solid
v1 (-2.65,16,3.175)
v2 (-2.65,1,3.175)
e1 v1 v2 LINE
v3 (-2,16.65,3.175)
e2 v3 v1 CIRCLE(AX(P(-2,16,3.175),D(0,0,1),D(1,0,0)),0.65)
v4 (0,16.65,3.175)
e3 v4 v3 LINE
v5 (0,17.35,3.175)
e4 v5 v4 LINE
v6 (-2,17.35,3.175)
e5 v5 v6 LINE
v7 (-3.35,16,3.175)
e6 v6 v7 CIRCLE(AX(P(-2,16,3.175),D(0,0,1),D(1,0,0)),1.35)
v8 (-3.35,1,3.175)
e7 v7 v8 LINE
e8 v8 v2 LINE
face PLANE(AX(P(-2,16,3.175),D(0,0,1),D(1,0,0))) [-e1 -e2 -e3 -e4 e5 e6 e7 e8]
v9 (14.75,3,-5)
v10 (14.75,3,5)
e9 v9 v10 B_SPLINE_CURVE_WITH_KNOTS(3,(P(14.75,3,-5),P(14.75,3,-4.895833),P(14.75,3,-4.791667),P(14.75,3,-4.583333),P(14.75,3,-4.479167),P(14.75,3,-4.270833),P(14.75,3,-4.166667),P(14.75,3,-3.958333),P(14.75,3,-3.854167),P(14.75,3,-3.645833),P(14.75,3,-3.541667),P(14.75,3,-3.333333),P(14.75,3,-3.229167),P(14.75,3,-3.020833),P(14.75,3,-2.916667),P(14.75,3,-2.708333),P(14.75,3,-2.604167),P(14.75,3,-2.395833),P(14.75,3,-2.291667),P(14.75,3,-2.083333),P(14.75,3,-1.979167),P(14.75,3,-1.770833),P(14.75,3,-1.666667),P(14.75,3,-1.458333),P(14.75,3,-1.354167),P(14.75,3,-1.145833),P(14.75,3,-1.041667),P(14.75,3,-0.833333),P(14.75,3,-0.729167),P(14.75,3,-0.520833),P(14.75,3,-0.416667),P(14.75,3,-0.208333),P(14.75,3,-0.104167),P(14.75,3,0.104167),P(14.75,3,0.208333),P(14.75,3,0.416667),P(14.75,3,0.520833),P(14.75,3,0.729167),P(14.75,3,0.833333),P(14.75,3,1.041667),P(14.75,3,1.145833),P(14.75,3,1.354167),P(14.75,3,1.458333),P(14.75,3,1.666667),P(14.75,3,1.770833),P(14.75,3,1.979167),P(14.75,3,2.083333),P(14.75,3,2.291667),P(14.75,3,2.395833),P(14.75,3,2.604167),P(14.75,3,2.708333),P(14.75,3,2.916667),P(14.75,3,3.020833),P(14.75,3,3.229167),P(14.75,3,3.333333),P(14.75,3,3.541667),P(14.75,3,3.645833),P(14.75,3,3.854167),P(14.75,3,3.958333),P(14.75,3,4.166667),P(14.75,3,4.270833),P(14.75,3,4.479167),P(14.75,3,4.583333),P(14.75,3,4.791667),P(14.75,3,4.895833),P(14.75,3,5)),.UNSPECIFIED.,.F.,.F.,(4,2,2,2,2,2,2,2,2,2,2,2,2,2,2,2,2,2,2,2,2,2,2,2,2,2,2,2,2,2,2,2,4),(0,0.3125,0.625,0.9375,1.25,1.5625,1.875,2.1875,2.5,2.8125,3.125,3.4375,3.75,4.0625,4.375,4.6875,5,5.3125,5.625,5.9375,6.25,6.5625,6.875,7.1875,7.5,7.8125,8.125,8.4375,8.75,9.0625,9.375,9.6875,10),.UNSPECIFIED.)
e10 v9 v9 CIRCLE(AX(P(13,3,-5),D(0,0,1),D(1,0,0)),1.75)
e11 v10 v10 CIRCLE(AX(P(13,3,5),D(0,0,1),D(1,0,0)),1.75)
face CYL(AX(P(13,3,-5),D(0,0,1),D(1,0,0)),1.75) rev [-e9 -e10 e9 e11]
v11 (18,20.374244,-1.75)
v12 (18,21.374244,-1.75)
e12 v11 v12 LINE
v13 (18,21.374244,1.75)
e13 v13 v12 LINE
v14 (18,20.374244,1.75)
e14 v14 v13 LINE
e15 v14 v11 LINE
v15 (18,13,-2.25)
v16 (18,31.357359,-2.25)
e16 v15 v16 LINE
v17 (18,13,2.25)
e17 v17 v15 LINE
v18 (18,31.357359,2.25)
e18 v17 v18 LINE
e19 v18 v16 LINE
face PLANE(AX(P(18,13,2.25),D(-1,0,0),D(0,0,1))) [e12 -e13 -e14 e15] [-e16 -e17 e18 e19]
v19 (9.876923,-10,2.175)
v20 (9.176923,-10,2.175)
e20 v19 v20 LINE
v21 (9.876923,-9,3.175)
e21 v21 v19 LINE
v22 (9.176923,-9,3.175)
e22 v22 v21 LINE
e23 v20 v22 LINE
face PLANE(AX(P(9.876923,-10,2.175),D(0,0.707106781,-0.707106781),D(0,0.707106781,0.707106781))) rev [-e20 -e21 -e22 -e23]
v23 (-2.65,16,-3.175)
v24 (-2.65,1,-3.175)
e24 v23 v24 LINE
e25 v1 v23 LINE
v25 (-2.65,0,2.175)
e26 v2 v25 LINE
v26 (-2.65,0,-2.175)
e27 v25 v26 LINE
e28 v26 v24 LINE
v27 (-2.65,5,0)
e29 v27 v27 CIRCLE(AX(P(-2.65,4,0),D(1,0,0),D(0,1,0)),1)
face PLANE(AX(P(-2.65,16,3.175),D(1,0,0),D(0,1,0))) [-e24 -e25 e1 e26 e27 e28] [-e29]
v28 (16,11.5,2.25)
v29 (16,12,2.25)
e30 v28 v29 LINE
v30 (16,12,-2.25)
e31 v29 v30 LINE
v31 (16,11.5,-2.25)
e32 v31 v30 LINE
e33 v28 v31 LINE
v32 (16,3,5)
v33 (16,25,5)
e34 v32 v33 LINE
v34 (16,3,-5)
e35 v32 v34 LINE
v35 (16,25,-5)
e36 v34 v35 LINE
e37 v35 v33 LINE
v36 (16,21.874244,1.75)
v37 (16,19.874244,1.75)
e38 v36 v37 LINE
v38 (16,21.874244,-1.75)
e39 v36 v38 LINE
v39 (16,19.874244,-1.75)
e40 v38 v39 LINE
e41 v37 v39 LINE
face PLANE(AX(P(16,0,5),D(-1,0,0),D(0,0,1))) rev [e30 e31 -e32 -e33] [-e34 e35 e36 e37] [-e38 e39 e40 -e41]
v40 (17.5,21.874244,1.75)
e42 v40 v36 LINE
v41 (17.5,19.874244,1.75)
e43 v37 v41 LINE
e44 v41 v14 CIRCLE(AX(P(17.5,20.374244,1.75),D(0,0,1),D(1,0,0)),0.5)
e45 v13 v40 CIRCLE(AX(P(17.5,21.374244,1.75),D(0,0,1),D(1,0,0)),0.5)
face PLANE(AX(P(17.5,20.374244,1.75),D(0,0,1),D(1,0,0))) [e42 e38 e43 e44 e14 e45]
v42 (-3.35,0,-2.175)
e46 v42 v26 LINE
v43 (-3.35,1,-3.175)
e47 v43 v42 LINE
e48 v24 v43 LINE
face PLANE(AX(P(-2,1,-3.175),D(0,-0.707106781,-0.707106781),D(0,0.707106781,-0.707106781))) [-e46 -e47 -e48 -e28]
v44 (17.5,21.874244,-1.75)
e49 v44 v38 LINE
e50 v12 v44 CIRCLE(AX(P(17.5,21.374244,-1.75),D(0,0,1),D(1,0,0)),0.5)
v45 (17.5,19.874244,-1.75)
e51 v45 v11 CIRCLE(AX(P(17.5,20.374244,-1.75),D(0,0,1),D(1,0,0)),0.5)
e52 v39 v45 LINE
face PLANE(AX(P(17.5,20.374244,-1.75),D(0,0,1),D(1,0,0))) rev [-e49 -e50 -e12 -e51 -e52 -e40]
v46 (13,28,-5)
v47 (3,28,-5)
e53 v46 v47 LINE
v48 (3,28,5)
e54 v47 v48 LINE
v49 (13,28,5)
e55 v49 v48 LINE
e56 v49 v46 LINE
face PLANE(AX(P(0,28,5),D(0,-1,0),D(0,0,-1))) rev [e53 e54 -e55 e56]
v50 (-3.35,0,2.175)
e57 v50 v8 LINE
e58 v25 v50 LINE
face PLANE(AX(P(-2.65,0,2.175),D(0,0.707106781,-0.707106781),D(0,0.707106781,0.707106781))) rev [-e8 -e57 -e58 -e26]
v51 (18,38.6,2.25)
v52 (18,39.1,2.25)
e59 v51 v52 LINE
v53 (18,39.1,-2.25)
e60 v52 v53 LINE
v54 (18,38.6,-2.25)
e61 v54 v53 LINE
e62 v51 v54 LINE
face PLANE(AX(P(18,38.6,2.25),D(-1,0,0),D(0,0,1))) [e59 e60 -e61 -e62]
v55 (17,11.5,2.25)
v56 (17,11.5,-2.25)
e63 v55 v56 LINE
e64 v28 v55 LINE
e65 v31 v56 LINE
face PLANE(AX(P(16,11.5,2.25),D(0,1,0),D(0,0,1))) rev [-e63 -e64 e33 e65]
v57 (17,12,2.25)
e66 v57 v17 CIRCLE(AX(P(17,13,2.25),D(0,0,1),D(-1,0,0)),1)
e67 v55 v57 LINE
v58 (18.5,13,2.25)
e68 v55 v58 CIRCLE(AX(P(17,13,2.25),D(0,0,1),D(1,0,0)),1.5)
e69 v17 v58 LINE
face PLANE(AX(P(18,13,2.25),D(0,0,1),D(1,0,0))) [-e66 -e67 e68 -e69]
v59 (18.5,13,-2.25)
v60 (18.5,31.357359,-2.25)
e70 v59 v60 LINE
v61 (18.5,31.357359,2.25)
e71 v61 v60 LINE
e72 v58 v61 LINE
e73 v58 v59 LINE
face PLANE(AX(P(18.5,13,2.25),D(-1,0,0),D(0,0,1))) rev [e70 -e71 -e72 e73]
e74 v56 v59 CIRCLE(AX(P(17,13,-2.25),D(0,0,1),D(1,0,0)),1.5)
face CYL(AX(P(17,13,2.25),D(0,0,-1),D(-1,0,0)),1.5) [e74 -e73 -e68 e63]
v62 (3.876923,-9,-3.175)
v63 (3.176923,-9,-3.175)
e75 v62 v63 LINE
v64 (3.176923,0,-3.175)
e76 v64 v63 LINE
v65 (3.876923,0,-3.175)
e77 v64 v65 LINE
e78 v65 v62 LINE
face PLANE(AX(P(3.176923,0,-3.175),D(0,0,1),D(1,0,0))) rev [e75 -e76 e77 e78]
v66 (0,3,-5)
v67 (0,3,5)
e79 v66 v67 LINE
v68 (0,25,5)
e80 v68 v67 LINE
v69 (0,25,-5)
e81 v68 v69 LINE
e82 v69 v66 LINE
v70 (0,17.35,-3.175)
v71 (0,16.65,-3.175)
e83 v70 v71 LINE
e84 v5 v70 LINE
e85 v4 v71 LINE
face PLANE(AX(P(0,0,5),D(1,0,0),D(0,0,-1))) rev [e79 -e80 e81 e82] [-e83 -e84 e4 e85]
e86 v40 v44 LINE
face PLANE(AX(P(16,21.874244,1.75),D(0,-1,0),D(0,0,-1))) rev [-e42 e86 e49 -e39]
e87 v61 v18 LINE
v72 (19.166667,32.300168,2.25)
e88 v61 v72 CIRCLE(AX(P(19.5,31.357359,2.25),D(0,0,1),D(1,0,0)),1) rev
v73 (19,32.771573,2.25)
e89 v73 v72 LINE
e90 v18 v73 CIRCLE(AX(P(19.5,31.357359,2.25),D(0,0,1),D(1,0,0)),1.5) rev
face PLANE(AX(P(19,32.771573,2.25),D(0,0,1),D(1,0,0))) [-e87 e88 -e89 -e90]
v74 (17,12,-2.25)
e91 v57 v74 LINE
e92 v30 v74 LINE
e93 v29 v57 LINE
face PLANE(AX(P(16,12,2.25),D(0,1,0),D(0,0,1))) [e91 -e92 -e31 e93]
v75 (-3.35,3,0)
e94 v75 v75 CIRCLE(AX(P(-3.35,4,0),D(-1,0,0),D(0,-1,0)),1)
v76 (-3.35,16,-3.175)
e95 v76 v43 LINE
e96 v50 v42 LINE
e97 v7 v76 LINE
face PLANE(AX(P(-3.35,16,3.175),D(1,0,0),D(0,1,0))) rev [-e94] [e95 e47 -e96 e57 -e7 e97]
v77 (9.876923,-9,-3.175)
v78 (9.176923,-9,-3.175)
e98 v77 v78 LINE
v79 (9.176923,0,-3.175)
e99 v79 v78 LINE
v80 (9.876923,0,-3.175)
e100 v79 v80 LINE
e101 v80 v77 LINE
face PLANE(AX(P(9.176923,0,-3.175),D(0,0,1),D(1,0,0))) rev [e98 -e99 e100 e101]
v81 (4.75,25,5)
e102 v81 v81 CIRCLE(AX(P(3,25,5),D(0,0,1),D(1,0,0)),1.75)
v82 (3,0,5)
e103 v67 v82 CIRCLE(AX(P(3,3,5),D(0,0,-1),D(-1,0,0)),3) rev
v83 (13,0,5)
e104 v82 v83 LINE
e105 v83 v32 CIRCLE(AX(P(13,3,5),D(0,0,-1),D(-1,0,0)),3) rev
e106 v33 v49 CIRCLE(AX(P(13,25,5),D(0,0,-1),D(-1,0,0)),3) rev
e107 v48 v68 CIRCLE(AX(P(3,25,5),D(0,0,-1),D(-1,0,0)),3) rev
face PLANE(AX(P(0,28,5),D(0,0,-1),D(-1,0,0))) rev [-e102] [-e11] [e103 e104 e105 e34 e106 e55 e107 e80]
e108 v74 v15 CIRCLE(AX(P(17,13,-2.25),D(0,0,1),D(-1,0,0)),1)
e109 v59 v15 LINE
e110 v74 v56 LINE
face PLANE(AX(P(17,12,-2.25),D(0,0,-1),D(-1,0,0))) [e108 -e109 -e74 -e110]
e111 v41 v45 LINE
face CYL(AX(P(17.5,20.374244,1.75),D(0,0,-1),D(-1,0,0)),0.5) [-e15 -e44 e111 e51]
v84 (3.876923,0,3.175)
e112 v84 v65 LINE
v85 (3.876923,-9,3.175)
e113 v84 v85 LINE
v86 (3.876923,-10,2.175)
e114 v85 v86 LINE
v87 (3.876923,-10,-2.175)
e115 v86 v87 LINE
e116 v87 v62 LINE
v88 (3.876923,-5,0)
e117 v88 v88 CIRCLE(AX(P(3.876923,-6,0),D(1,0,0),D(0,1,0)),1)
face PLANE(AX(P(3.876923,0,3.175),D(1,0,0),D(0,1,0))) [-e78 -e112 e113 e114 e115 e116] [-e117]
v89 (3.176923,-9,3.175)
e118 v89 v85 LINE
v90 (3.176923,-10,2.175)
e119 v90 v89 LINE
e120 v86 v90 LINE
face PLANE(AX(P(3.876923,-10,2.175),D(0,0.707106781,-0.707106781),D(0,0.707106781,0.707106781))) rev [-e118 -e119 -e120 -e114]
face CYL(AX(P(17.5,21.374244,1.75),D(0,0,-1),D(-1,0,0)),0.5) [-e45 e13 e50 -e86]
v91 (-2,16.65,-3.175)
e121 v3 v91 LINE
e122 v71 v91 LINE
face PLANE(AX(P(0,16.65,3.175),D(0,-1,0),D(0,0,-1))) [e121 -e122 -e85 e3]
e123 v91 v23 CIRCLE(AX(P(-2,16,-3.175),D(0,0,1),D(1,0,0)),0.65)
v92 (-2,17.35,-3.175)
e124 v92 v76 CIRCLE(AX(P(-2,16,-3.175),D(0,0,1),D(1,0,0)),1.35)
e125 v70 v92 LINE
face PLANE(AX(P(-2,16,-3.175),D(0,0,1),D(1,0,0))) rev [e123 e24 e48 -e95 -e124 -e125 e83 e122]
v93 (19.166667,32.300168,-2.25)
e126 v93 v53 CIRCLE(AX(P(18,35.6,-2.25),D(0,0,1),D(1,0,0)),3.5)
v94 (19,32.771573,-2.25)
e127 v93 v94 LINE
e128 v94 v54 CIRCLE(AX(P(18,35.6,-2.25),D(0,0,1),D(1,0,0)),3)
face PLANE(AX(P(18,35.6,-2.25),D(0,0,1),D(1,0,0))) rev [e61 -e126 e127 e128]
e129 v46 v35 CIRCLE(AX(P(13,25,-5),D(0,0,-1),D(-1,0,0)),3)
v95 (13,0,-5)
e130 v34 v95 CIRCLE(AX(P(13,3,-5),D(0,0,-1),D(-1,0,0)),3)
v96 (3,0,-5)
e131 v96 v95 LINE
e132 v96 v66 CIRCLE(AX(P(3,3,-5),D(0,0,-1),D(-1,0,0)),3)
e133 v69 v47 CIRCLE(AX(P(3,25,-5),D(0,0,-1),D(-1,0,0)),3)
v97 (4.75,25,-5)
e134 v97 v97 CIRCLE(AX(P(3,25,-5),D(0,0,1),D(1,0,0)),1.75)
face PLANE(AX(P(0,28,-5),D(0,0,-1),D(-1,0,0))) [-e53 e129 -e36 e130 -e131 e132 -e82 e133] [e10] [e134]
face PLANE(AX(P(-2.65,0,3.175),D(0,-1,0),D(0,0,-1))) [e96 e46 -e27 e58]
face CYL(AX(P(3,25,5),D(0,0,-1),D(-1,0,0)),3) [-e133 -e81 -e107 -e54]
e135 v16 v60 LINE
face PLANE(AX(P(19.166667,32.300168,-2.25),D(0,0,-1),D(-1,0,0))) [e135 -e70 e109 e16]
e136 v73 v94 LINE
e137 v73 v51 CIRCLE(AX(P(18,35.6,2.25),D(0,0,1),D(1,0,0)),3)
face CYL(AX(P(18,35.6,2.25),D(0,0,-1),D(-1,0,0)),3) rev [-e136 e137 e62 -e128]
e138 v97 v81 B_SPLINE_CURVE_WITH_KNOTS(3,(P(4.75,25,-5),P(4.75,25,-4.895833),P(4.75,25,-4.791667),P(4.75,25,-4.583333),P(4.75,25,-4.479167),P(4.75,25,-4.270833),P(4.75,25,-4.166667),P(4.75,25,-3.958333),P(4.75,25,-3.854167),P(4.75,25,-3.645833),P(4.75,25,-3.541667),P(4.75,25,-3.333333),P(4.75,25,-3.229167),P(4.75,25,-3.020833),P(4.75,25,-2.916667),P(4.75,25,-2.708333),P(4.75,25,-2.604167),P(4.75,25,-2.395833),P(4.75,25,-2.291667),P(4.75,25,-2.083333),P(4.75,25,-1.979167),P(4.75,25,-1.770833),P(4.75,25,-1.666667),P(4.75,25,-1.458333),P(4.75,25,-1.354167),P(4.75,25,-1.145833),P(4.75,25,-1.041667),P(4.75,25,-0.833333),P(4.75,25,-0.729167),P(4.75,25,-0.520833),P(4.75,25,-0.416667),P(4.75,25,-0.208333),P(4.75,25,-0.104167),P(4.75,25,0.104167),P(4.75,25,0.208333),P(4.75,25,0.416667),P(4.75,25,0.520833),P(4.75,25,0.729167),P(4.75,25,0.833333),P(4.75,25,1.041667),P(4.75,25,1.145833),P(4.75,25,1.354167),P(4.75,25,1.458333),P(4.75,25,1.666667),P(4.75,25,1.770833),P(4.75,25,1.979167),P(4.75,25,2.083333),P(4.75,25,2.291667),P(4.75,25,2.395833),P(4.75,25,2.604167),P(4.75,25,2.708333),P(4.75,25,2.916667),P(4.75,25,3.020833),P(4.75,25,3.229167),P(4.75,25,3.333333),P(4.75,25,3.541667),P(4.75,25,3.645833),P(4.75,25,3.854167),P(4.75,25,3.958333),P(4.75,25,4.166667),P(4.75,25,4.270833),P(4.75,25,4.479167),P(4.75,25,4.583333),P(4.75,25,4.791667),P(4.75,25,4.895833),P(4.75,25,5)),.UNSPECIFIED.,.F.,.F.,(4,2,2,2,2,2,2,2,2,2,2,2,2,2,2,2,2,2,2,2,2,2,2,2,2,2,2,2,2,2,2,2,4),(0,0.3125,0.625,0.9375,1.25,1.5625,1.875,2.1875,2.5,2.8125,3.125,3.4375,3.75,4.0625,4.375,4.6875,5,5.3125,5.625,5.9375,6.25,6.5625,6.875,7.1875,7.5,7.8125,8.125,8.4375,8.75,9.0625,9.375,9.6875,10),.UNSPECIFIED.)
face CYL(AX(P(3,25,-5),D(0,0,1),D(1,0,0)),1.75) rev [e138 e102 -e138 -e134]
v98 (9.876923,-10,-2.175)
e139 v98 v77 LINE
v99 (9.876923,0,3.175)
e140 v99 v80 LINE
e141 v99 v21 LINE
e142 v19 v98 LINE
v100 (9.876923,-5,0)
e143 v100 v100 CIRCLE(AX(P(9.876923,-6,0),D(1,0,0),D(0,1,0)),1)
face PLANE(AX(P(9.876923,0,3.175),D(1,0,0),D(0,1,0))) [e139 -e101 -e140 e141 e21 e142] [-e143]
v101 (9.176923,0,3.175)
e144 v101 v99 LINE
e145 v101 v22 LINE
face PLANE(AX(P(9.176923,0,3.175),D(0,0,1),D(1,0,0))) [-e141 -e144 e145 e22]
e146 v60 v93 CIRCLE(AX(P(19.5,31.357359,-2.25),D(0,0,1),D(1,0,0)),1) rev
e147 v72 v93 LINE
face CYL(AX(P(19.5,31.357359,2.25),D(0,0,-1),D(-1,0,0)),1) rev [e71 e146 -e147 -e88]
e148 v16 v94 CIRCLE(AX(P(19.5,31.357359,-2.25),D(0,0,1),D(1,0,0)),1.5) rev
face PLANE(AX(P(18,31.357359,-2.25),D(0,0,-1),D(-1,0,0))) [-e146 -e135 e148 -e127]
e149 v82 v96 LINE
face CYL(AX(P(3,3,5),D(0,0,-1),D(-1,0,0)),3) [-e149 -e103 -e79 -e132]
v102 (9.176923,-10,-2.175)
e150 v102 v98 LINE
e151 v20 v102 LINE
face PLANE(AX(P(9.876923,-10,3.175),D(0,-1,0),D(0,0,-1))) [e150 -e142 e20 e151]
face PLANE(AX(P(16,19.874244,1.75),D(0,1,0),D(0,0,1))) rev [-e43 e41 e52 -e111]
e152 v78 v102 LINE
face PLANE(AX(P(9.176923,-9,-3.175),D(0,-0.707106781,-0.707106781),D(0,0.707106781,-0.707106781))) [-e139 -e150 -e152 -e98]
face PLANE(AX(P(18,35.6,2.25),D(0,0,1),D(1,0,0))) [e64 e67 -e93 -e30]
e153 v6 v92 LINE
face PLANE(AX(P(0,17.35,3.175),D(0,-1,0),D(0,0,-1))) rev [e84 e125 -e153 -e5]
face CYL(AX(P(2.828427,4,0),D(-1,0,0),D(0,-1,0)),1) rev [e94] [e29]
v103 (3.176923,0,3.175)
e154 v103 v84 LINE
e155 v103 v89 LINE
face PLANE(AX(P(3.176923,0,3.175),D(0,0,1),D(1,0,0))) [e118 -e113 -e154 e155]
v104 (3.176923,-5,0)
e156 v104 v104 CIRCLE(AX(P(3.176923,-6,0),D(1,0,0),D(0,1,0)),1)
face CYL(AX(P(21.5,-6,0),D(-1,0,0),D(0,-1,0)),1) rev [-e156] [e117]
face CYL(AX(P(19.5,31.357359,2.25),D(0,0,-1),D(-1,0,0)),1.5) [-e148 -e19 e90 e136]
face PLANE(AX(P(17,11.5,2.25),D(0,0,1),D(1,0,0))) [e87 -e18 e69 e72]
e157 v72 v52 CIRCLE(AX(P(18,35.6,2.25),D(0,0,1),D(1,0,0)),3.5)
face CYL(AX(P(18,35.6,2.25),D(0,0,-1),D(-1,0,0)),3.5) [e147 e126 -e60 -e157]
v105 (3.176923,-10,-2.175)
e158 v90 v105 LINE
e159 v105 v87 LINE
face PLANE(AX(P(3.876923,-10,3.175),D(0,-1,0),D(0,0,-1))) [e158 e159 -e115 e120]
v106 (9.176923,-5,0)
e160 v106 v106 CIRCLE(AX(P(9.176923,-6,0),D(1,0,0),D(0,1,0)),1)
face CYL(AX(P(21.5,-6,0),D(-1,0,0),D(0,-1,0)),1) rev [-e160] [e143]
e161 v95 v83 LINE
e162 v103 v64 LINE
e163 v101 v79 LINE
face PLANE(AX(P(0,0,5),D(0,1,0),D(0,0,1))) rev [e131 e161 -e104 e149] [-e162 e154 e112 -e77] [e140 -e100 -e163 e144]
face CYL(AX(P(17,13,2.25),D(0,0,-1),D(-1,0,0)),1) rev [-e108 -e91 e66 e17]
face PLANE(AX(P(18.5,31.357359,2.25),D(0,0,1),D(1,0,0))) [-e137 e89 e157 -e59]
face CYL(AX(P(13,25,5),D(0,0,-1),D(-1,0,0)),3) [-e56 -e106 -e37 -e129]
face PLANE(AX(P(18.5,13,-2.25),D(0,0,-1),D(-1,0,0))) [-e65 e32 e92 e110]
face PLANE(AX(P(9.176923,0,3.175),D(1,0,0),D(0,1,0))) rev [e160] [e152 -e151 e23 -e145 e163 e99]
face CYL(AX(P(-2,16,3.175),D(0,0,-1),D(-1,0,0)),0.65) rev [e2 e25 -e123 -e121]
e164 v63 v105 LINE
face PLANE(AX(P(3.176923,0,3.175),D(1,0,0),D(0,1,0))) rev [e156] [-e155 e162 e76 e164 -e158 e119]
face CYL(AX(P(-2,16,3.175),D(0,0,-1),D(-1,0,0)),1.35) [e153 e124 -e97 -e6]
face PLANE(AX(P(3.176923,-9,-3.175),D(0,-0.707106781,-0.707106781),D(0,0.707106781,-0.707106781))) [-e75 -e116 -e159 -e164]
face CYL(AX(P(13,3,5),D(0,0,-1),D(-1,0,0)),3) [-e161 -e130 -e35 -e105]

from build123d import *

# Parameters (mm, degrees)
ESBO_O1_W             = 16
ESBO_O1_H             = 28
EXTRUS_O1_DEPTH       = 5
FILETE1_R             = 3
ESBO_O2_R             = 1.75
CORTE_EXTRUS_O1_DEPTH = 34.763886032
FLANGE_BASE1_START    = -2.25
FLANGE_BASE1_DEPTH    = 4.5
EXTRUS_O2_DEPTH       = 1.75
EXTRUS_O_FINA1_DEPTH  = 3.175
ESBO_O6_4_W           = 0.7
ESBO_O6_4_H           = 10
EXTRUS_O_FINA2_DEPTH  = 3.175
ESBO_O6_5_W           = 0.7
ESBO_O6_5_H           = 10
EXTRUS_O_FINA3_DEPTH  = 3.175
CHANFRO1_SIZE         = 1
ESBO_O7_R             = 1
CORTE_EXTRUS_O8_DEPTH = 3.35
ESBO_O7_6_R           = 1
CORTE_EXTRUS_O9_DEPTH = 47.597558949


# Read off the part's stored shape, not the designer's step: Flange-base1
with BuildPart() as part:
    # Esboço1 → Extrusão1 (new, symmetric)
    with BuildSketch(Plane.XY):
        with Locations((8, 14)):
            Rectangle(ESBO_O1_W, ESBO_O1_H)
    extrude(amount=EXTRUS_O1_DEPTH, both=True)

    # Filete1
    filete1_edges = [part.edges().sort_by_distance(p)[0] for p in [
        (0, 28, 0),
        (16, 28, 0),
        (16, 0, 0),
        (0, 0, 0),
    ]]
    fillet(filete1_edges, radius=FILETE1_R)

    # Esboço2 → Corte-extrusão1 (cut, through all)
    with BuildSketch(Plane.XY.offset(5)):
        with Locations((3, 25)):
            Circle(ESBO_O2_R)
        with Locations((13, 3)):
            Circle(ESBO_O2_R)
    extrude(amount=-CORTE_EXTRUS_O1_DEPTH, mode=Mode.SUBTRACT)



with BuildPart() as body_2:
    # Flange-base1 outline → Flange-base1 (new body)
    with BuildSketch(Plane.XY.offset(FLANGE_BASE1_START)):
        with BuildLine():
            ThreePointArc((19.166666667, 32.300168354), (21.449594959, 36.191856925), (18, 39.1))
            Line((18, 39.1), (18, 38.6))
            ThreePointArc((18, 38.6), (20.956795679, 36.107305936), (19, 32.771572875))
            ThreePointArc((19, 32.771572875), (18.275255129, 32.223384717), (18, 31.357359313))
            Line((18, 31.357359313), (18, 13))
            ThreePointArc((18, 13), (17.707106781, 12.292893219), (17, 12))
            Line((17, 12), (16, 12))
            Line((16, 12), (16, 11.5))
            Line((16, 11.5), (17, 11.5))
            ThreePointArc((17, 11.5), (18.060660172, 11.939339828), (18.5, 13))
            Line((18.5, 13), (18.5, 31.357359313))
            ThreePointArc((18.5, 31.357359313), (18.683503419, 31.934709582), (19.166666667, 32.300168354))
        make_face()
    extrude(amount=FLANGE_BASE1_DEPTH)


with BuildPart() as part_1:
    add(part.part)

    add(body_2.part)  # Extrusão2 merges body 2
    # Esboço5 → Extrusão2 (add, symmetric)
    with BuildSketch(Plane.XY):
        with BuildLine():
            Line((16, 21.874244368), (17.5, 21.874244368))
            ThreePointArc((17.5, 21.874244368), (17.853553391, 21.727797759), (18, 21.374244368))
            Line((18, 21.374244368), (18, 20.374244368))
            ThreePointArc((18, 20.374244368), (17.853553391, 20.020690978), (17.5, 19.874244368))
            Line((17.5, 19.874244368), (16, 19.874244368))
            Line((16, 19.874244368), (16, 21.874244368))
        make_face()
    extrude(amount=EXTRUS_O2_DEPTH, both=True)

    # Esboço6 → Extrusão-Fina1 (add, symmetric)
    with BuildSketch(Plane.XY):
        with BuildLine():
            Line((0, 17.35), (-2, 17.35))
            ThreePointArc((-2, 17.35), (-2.954594155, 16.954594155), (-3.35, 16))
            Line((-3.35, 16), (-3.35, 0))
            Line((-3.35, 0), (-2.65, 0))
            Line((-2.65, 0), (-2.65, 16))
            ThreePointArc((-2.65, 16), (-2.459619408, 16.459619408), (-2, 16.65))
            Line((-2, 16.65), (0, 16.65))
            Line((0, 16.65), (0, 17.35))
        make_face()
    extrude(amount=EXTRUS_O_FINA1_DEPTH, both=True)

    # Esboço6<4> → Extrusão-Fina2 (add, symmetric)
    with BuildSketch(Plane.XY):
        with Locations((3.526922814, -5)):
            Rectangle(ESBO_O6_4_W, ESBO_O6_4_H)
    extrude(amount=EXTRUS_O_FINA2_DEPTH, both=True)

    # Esboço6<5> → Extrusão-Fina3 (add, symmetric)
    with BuildSketch(Plane.XY):
        with Locations((3.526922814, -5)):
            Rectangle(ESBO_O6_5_W, ESBO_O6_5_H)
        with BuildLine():
            Line((0, 17.35), (-2, 17.35))
            ThreePointArc((-2, 17.35), (-2.954594155, 16.954594155), (-3.35, 16))
            Line((-3.35, 16), (-3.35, 0))
            Line((-3.35, 0), (-2.65, 0))
            Line((-2.65, 0), (-2.65, 16))
            ThreePointArc((-2.65, 16), (-2.459619408, 16.459619408), (-2, 16.65))
            Line((-2, 16.65), (0, 16.65))
            Line((0, 16.65), (0, 17.35))
        make_face()
        with Locations((9.526922814, -5)):
            Rectangle(ESBO_O6_5_W, ESBO_O6_5_H)
    extrude(amount=EXTRUS_O_FINA3_DEPTH, both=True)

    # Chanfro1
    chanfro1_edges = [part_1.edges().sort_by_distance(p)[0] for p in [
        (-3, 0, -3.175),
        (3.526922814, -10, 3.175),
        (3.526922814, -10, -3.175),
        (9.526922814, -10, 3.175),
        (9.526922814, -10, -3.175),
        (-3, 0, 3.175),
    ]]
    chamfer(chanfro1_edges, length=CHANFRO1_SIZE)

    # Esboço7 → Corte-extrusão8 (cut)
    with BuildSketch(Plane.ZY.offset(3.35)):
        with Locations(Location((0, 4, 0), (0, 0, 270))):
            Circle(ESBO_O7_R)
    extrude(amount=-CORTE_EXTRUS_O8_DEPTH, mode=Mode.SUBTRACT)

    # Esboço7<6> → Corte-extrusão9 (cut, through all)
    with BuildSketch(Plane.ZY.offset(3.35)):
        with Locations(Location((0, -6, 0), (0, 0, 90))):
            Circle(ESBO_O7_6_R)
    extrude(amount=-CORTE_EXTRUS_O9_DEPTH, mode=Mode.SUBTRACT)


solid = part_1.part
